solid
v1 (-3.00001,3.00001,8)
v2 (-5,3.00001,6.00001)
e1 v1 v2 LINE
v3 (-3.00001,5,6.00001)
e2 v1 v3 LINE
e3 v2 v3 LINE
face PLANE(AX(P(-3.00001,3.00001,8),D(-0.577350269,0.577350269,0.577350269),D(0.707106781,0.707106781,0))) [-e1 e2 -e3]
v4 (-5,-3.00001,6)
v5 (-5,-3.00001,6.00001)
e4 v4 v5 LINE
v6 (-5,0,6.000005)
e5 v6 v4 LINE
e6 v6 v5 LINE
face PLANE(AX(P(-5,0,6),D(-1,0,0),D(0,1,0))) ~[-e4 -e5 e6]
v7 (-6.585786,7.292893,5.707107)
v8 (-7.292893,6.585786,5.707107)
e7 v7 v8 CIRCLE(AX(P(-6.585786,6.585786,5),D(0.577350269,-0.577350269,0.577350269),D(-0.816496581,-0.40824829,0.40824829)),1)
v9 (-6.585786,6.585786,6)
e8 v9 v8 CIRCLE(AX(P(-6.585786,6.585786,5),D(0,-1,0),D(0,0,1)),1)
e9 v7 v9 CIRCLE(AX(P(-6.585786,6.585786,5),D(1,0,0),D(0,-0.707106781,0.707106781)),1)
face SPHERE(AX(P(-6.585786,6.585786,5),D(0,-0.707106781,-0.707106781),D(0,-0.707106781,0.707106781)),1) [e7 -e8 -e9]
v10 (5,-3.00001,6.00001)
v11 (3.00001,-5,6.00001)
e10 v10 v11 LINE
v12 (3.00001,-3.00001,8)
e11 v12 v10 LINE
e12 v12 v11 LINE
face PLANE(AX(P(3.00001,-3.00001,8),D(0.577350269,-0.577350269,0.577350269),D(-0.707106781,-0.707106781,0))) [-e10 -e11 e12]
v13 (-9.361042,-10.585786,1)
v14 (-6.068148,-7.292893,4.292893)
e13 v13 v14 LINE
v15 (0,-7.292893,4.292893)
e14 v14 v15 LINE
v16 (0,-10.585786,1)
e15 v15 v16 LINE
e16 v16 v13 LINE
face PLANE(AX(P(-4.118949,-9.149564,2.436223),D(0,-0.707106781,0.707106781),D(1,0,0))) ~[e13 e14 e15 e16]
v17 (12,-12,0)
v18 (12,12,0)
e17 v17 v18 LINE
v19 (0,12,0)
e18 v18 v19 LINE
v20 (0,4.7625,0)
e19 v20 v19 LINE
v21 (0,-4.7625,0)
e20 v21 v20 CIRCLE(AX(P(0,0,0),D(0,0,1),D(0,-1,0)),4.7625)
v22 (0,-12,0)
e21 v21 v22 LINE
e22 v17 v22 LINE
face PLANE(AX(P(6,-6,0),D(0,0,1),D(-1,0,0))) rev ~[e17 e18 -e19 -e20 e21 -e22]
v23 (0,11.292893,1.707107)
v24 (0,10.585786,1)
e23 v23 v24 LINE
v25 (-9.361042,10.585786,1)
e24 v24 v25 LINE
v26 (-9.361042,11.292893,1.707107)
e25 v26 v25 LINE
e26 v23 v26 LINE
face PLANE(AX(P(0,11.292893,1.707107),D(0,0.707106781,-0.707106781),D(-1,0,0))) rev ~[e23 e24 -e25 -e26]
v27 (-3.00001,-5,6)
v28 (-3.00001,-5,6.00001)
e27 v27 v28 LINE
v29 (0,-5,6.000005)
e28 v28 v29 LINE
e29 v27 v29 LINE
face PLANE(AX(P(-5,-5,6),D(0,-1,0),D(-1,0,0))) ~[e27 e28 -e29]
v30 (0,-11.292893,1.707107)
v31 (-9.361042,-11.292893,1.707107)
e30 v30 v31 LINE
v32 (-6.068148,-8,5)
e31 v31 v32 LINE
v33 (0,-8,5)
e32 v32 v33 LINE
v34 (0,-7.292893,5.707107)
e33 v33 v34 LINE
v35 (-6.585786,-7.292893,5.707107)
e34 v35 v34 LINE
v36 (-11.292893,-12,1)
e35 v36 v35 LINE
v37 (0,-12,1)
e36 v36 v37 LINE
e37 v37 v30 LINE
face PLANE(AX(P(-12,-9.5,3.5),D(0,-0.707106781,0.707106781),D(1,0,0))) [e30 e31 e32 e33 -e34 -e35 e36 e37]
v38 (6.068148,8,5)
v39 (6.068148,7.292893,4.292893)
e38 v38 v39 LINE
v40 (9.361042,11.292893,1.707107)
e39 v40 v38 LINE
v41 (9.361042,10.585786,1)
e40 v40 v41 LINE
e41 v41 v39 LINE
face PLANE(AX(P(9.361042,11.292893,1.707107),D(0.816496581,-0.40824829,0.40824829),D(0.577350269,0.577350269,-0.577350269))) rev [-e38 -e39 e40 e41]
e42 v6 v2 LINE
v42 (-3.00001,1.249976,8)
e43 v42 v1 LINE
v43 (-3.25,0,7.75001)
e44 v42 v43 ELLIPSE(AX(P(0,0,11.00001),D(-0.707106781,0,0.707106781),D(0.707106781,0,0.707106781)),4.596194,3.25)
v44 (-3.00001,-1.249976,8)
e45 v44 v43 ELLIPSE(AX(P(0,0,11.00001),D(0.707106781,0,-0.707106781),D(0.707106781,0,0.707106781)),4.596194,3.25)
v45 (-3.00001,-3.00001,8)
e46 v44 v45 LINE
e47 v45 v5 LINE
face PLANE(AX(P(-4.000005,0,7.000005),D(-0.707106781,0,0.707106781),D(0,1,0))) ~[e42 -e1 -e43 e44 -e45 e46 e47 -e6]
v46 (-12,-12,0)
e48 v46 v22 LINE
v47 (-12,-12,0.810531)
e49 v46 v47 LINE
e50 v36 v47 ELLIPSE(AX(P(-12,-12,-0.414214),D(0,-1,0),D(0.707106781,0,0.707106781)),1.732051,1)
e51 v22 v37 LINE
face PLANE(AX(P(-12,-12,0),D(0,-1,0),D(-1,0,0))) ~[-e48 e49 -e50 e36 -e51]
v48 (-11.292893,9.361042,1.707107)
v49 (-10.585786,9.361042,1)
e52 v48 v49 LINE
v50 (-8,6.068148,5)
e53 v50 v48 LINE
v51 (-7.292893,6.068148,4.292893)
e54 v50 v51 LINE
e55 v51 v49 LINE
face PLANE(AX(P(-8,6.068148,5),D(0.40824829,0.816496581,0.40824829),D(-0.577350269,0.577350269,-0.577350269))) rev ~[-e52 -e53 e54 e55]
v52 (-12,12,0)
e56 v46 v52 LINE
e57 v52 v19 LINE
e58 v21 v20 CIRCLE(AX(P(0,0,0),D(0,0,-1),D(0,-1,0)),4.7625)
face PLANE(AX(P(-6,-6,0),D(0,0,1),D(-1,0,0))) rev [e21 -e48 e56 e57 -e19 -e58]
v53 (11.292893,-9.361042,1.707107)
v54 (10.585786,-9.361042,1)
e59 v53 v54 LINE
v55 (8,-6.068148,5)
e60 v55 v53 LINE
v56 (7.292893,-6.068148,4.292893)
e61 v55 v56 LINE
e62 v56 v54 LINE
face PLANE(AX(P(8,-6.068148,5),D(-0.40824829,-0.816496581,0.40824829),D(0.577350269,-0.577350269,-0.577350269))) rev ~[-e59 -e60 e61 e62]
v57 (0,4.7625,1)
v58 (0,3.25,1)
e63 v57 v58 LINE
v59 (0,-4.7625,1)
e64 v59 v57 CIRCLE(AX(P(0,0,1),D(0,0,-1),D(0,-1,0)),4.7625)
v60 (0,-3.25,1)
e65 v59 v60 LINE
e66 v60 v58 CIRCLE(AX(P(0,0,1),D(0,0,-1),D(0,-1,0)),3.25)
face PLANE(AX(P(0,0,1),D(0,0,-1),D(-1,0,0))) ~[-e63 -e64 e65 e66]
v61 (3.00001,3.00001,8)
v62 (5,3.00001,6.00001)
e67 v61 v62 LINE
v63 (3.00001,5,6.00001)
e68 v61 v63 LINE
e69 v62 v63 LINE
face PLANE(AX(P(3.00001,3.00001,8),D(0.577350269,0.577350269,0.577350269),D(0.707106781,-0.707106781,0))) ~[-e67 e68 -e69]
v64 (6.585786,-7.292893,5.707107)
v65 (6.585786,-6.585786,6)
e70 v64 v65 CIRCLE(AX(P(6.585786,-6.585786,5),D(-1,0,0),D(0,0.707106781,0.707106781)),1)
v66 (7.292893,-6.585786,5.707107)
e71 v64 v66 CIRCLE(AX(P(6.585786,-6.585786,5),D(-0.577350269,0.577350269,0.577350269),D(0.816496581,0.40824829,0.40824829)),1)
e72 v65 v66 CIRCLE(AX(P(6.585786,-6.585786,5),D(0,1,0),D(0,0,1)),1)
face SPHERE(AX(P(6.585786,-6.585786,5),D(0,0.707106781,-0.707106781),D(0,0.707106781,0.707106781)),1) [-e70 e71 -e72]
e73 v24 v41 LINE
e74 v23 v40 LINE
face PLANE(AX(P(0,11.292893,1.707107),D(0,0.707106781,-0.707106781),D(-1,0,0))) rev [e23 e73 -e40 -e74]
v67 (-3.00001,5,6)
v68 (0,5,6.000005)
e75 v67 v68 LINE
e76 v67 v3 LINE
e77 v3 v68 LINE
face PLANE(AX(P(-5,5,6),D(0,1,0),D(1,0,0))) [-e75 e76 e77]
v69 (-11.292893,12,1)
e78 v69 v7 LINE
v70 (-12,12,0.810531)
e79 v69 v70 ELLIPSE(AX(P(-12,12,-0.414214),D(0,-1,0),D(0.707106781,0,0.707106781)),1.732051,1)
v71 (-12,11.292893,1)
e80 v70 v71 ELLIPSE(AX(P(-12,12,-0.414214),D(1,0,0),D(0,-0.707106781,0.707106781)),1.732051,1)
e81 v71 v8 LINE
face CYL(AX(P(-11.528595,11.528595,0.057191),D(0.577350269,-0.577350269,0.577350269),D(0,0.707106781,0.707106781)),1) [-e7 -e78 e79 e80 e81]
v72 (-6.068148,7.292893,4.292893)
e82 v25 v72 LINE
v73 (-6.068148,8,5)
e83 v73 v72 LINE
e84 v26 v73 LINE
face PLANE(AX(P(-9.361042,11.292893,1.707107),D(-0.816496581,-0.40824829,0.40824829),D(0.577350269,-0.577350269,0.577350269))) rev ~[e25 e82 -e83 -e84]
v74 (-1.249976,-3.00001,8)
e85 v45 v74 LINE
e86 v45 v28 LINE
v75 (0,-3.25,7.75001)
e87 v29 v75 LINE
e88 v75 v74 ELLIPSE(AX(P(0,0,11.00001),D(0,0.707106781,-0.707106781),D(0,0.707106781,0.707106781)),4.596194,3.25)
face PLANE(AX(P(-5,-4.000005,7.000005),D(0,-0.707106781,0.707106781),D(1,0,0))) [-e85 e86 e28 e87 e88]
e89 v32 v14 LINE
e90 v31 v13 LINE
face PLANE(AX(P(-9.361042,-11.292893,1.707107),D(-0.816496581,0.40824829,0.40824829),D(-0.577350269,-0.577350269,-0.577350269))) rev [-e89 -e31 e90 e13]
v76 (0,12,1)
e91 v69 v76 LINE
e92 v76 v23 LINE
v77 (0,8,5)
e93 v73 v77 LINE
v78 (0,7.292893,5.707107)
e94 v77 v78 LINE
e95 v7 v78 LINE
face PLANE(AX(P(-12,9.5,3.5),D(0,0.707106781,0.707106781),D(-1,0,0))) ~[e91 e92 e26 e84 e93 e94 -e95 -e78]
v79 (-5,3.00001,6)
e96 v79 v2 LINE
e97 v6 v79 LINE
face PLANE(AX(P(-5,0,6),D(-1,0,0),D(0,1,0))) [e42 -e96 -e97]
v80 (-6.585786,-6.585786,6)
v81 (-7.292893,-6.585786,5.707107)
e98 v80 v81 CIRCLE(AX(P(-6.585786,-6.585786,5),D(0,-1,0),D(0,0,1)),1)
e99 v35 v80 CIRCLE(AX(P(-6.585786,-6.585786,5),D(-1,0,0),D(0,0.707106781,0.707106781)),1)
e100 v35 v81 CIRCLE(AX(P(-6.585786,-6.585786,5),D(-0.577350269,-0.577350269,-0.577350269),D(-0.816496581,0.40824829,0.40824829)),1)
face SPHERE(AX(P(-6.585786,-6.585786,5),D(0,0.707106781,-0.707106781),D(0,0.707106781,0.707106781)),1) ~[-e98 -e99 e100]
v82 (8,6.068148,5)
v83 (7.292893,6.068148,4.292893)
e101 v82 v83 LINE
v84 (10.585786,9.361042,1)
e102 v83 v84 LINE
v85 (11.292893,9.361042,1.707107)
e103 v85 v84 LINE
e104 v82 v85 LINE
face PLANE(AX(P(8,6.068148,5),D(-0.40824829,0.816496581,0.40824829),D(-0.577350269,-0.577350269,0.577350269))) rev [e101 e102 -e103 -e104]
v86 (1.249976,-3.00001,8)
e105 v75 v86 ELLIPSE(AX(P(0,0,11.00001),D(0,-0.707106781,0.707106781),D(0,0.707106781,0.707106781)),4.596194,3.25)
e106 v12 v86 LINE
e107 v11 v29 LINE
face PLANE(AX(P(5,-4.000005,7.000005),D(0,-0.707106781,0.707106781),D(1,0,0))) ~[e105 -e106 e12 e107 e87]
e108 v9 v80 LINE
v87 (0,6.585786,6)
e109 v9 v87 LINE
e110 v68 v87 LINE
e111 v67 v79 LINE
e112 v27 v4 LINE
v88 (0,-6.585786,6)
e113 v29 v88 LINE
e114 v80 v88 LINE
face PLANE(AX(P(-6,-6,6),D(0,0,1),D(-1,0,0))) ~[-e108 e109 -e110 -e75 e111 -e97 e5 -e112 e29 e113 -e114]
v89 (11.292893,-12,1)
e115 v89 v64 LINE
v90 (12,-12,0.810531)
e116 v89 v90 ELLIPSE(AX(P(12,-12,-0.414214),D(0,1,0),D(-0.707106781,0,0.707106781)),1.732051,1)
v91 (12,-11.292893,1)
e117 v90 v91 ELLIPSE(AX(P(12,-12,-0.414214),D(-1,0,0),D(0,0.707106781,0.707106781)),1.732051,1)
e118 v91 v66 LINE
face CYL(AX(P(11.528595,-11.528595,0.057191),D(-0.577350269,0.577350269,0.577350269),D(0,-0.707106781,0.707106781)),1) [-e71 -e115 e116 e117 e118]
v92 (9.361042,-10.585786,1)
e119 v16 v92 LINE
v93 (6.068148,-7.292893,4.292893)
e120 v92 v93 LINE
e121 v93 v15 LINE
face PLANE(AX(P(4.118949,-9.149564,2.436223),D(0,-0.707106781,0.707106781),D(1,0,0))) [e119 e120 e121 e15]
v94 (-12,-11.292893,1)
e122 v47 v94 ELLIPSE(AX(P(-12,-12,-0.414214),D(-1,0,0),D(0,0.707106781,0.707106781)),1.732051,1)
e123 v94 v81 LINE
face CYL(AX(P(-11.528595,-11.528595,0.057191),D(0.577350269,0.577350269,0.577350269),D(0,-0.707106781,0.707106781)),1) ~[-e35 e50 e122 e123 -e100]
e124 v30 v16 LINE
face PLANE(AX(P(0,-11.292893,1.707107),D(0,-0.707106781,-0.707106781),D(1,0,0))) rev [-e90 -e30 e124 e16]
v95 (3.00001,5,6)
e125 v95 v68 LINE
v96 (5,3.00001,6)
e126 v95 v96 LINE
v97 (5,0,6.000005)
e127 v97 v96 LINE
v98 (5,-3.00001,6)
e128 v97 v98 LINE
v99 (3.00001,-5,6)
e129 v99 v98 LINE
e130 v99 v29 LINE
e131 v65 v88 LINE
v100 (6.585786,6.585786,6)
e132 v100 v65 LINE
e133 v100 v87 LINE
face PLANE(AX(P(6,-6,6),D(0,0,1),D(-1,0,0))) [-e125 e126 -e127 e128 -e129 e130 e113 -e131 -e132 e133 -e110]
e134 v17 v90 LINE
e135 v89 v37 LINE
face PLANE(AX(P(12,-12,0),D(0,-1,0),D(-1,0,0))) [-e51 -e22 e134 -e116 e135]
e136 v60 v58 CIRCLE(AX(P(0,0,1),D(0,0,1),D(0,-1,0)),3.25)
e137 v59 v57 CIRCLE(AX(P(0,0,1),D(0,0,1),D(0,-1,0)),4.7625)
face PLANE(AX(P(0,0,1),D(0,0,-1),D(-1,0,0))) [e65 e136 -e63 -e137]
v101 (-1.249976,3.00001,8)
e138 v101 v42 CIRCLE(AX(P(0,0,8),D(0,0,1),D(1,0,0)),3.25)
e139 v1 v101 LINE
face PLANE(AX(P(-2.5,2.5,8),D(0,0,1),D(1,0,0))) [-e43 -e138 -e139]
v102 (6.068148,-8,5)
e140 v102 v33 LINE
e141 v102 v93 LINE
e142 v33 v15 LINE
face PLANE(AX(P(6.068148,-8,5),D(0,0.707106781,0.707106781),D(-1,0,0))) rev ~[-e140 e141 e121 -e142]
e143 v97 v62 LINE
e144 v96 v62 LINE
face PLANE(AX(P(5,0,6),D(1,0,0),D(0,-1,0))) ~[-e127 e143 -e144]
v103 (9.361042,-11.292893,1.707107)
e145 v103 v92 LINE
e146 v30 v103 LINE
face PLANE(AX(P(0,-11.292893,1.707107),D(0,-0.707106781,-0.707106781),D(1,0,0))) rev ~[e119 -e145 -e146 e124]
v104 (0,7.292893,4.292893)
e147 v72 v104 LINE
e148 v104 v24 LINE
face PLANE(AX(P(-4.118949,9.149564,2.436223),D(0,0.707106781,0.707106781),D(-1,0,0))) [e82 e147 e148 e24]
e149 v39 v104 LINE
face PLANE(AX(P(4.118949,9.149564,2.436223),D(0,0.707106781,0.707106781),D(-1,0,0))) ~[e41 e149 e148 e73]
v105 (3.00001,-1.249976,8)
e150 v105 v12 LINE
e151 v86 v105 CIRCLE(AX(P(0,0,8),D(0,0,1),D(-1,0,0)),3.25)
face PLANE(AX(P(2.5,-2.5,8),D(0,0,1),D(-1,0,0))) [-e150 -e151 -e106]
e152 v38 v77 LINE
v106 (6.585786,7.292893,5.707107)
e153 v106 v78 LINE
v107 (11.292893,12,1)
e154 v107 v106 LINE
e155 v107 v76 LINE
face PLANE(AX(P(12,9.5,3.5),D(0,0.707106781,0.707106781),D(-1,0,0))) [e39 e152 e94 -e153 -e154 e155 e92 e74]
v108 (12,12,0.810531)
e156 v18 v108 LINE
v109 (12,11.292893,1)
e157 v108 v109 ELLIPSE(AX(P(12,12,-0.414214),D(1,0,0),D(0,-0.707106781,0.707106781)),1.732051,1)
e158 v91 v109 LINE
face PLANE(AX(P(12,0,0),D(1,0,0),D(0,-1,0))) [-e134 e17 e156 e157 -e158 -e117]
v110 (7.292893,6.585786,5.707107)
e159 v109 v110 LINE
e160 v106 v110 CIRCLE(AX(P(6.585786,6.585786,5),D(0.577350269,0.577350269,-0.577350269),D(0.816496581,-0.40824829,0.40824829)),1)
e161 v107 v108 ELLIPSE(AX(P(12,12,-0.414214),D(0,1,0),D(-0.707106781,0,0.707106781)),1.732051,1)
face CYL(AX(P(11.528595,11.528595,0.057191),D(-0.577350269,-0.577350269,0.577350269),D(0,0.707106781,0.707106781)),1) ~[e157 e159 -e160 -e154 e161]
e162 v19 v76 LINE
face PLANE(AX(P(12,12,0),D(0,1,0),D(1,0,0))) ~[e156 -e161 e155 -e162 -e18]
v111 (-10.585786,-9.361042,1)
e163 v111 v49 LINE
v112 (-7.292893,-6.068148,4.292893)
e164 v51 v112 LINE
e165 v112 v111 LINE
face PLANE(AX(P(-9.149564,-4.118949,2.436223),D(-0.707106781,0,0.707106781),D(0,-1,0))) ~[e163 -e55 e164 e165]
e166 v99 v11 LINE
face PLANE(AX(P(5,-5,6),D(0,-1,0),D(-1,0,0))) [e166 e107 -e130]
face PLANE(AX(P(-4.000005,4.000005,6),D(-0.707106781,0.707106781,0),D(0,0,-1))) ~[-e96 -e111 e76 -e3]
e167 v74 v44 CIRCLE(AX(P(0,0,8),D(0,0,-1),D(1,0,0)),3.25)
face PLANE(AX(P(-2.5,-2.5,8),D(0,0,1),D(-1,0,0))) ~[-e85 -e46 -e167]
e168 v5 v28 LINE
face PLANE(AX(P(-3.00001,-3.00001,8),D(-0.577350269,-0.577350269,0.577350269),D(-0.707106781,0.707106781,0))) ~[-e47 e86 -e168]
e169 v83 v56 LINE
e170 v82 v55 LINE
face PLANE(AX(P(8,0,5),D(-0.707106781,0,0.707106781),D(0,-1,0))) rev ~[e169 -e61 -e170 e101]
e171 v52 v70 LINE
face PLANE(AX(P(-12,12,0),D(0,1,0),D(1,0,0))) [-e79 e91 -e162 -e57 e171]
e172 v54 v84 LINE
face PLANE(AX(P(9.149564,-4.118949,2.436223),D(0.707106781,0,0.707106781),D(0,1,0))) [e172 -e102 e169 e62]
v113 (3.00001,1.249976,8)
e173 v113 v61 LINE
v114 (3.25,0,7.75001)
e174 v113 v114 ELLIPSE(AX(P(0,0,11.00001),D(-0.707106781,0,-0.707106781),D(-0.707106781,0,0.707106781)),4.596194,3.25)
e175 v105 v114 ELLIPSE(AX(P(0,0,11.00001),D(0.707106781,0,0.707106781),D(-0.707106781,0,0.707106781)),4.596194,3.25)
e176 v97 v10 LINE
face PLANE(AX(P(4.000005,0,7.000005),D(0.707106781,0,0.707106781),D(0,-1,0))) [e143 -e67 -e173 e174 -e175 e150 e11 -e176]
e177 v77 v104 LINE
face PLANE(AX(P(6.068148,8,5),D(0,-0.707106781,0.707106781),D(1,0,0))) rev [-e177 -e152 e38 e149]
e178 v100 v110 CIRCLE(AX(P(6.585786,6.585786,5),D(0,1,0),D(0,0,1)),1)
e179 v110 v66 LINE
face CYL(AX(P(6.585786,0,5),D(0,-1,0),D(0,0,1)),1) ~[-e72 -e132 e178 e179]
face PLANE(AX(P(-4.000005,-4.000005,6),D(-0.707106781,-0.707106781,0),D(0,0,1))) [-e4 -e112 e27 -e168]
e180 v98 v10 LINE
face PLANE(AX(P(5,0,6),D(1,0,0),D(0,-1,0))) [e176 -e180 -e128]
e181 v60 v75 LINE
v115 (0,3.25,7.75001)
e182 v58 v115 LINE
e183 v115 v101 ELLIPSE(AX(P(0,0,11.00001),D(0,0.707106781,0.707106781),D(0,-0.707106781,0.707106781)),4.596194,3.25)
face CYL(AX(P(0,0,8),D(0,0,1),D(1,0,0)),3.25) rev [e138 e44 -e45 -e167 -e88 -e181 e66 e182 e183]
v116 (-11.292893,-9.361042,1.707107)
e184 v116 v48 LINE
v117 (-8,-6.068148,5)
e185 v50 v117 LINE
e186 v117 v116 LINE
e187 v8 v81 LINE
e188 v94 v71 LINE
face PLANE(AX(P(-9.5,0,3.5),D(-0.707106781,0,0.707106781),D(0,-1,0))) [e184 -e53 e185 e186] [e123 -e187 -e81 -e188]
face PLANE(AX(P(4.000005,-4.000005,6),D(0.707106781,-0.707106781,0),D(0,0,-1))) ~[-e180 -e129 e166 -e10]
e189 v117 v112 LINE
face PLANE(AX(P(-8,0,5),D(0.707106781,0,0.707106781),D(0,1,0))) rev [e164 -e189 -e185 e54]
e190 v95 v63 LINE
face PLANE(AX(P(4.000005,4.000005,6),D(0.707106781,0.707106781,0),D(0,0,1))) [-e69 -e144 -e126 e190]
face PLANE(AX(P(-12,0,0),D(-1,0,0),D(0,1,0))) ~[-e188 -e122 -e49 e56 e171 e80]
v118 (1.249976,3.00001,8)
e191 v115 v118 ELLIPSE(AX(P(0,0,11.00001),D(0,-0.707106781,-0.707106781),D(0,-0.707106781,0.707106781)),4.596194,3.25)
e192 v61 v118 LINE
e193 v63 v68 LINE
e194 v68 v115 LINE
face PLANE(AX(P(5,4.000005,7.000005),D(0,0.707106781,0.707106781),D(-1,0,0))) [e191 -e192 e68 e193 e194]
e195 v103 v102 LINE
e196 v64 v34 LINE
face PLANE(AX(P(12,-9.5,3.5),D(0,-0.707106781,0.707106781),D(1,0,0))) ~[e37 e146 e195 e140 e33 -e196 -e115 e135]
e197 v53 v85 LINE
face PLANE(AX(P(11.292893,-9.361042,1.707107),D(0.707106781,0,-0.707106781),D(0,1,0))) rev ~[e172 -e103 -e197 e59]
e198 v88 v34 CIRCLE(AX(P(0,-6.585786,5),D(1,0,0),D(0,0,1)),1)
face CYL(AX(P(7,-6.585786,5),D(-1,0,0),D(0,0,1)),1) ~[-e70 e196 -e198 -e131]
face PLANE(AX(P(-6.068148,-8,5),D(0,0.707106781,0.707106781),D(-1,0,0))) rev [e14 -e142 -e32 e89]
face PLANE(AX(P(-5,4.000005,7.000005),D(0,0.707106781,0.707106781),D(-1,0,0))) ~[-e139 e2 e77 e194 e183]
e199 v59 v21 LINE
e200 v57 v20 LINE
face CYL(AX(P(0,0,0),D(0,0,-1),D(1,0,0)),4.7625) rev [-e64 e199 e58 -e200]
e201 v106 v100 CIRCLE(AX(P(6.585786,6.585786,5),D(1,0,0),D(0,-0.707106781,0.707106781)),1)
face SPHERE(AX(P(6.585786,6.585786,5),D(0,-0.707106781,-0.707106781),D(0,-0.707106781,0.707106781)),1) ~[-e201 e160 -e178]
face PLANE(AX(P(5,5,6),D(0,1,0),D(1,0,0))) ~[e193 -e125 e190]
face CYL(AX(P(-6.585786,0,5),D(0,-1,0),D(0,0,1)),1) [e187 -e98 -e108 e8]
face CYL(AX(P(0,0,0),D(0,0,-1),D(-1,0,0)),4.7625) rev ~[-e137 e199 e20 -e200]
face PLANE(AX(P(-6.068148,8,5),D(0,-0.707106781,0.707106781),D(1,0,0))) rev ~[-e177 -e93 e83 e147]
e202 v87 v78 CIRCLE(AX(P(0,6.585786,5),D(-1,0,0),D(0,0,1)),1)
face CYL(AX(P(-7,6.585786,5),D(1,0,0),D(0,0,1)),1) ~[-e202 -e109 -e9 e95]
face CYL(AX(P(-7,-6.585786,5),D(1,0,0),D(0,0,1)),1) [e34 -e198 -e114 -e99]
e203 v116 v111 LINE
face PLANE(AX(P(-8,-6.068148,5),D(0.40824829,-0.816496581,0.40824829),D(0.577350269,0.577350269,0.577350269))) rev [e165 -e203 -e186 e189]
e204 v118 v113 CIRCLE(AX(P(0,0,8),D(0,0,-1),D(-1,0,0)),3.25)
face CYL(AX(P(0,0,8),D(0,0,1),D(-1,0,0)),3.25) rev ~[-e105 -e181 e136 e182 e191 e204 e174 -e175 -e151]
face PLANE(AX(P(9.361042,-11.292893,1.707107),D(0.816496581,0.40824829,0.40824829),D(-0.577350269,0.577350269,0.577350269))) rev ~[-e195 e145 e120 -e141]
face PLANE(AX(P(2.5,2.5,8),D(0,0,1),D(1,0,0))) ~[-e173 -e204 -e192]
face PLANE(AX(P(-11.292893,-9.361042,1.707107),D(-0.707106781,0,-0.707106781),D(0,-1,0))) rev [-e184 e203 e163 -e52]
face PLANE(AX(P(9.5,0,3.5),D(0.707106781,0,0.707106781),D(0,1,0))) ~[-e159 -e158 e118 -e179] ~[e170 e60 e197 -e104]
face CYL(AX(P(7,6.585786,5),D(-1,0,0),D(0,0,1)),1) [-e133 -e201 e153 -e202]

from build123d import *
from build123d import SkipClean  # not in build123d's __all__

# Parameters (mm, degrees)
F0_W      = 12
F0_H      = 12
F1_DEPTH  = 6
F2_R      = 4.7625
F3_DEPTH  = 1
F4_W      = 5
F4_H      = 5
F5_DEPTH  = 2
F6_SIZE   = 5
F7_SIZE   = 1.99999
F8_R      = 1
F10_DEPTH = 1
F12_DEPTH = 1
F13_R     = 3.25
F14_DEPTH = 7


# Not quite as in the source:
# - a fillet or chamfer is up to 0.001 mm smaller than in the source, because OpenCascade refuses the exact size


with BuildPart() as f1:
    # F0 (on Top) → F1 (new body)
    with BuildSketch(Plane.XY):
        with Locations((-6, 6)):
            Rectangle(F0_W, F0_H)
    extrude(amount=F1_DEPTH)

    # F2 (on face) → F3 (cut)
    with BuildSketch(Plane(origin=(0, 0, 0), x_dir=(1, 0, 0), z_dir=(0, 0, -1))):
        Circle(F2_R)
    extrude(amount=-F3_DEPTH, mode=Mode.SUBTRACT)

    # F4 (on face) → F5 (join)
    with BuildSketch(Plane.XY.offset(6)):
        with Locations((-2.5, 2.5)):
            Rectangle(F4_W, F4_H)
    extrude(amount=F5_DEPTH)

    # F6
    f6_edges = [f1.edges().sort_by_distance(p)[0] for p in [
        (-12, 6, 6),
        (-6, 12, 6),
    ]]
    chamfer(f6_edges, length=F6_SIZE)

    # F7 (size 2 in the source; OpenCascade refuses exactly that, so slightly less here)
    f7_edges = [f1.edges().sort_by_distance(p)[0] for p in [
        (-5, 5, 7),
        (-5, 2.5, 8),
        (-2.5, 5, 8),
    ]]
    chamfer(f7_edges, length=F7_SIZE)

    # F8
    f8_edges = [f1.edges().sort_by_distance(p)[0] for p in [
        (-7, 3.5, 6),
        (-3.5, 7, 6),
        (-9.5, 9.5, 3.5),
    ]]
    fillet(f8_edges, radius=F8_R)

    # F9 (on face) → F10 (cut)
    with BuildSketch(Plane(origin=(0, 6.5, 6.5), x_dir=(-1, 0, 0), z_dir=(0, 0.7071067812, 0.7071067812))):
        Polygon((0, -6.7781745931), (9.3610415662, -6.7781745931), (6.0681483474, -2.1213203436), (0, -2.1213203436), align=None)
    extrude(amount=-F10_DEPTH, mode=Mode.SUBTRACT)

    # F11 (on face) → F12 (cut)
    with BuildSketch(Plane(origin=(-6.5, 0, 6.5), x_dir=(0, -1, 0), z_dir=(-0.7071067812, 0, 0.7071067812))):
        Polygon((0, -6.7781745931), (0, -2.1213203436), (-6.0681483474, -2.1213203436), (-9.3610415662, -6.7781745931), align=None)
    extrude(amount=-F12_DEPTH, mode=Mode.SUBTRACT)

    # F13 (on face) → F14 (cut, through all)
    with BuildSketch(Plane.XY.offset(8)):
        Circle(F13_R)
    extrude(amount=-F14_DEPTH, mode=Mode.SUBTRACT)

    # F15: F1 across plane


with BuildPart() as f1_1:
    add(f1.part, clean=False)
    add(f1.part.mirror(Plane.XZ), clean=False)

    # F16: F1 across plane


with BuildPart() as f1_2:
    add(f1_1.part, clean=False)
    with SkipClean():  # cleaning this boolean's faces spoils the solid; the shape is the same uncleaned
        add(f1_1.part.mirror(Plane.YZ), clean=False)


solid = f1_2.part
